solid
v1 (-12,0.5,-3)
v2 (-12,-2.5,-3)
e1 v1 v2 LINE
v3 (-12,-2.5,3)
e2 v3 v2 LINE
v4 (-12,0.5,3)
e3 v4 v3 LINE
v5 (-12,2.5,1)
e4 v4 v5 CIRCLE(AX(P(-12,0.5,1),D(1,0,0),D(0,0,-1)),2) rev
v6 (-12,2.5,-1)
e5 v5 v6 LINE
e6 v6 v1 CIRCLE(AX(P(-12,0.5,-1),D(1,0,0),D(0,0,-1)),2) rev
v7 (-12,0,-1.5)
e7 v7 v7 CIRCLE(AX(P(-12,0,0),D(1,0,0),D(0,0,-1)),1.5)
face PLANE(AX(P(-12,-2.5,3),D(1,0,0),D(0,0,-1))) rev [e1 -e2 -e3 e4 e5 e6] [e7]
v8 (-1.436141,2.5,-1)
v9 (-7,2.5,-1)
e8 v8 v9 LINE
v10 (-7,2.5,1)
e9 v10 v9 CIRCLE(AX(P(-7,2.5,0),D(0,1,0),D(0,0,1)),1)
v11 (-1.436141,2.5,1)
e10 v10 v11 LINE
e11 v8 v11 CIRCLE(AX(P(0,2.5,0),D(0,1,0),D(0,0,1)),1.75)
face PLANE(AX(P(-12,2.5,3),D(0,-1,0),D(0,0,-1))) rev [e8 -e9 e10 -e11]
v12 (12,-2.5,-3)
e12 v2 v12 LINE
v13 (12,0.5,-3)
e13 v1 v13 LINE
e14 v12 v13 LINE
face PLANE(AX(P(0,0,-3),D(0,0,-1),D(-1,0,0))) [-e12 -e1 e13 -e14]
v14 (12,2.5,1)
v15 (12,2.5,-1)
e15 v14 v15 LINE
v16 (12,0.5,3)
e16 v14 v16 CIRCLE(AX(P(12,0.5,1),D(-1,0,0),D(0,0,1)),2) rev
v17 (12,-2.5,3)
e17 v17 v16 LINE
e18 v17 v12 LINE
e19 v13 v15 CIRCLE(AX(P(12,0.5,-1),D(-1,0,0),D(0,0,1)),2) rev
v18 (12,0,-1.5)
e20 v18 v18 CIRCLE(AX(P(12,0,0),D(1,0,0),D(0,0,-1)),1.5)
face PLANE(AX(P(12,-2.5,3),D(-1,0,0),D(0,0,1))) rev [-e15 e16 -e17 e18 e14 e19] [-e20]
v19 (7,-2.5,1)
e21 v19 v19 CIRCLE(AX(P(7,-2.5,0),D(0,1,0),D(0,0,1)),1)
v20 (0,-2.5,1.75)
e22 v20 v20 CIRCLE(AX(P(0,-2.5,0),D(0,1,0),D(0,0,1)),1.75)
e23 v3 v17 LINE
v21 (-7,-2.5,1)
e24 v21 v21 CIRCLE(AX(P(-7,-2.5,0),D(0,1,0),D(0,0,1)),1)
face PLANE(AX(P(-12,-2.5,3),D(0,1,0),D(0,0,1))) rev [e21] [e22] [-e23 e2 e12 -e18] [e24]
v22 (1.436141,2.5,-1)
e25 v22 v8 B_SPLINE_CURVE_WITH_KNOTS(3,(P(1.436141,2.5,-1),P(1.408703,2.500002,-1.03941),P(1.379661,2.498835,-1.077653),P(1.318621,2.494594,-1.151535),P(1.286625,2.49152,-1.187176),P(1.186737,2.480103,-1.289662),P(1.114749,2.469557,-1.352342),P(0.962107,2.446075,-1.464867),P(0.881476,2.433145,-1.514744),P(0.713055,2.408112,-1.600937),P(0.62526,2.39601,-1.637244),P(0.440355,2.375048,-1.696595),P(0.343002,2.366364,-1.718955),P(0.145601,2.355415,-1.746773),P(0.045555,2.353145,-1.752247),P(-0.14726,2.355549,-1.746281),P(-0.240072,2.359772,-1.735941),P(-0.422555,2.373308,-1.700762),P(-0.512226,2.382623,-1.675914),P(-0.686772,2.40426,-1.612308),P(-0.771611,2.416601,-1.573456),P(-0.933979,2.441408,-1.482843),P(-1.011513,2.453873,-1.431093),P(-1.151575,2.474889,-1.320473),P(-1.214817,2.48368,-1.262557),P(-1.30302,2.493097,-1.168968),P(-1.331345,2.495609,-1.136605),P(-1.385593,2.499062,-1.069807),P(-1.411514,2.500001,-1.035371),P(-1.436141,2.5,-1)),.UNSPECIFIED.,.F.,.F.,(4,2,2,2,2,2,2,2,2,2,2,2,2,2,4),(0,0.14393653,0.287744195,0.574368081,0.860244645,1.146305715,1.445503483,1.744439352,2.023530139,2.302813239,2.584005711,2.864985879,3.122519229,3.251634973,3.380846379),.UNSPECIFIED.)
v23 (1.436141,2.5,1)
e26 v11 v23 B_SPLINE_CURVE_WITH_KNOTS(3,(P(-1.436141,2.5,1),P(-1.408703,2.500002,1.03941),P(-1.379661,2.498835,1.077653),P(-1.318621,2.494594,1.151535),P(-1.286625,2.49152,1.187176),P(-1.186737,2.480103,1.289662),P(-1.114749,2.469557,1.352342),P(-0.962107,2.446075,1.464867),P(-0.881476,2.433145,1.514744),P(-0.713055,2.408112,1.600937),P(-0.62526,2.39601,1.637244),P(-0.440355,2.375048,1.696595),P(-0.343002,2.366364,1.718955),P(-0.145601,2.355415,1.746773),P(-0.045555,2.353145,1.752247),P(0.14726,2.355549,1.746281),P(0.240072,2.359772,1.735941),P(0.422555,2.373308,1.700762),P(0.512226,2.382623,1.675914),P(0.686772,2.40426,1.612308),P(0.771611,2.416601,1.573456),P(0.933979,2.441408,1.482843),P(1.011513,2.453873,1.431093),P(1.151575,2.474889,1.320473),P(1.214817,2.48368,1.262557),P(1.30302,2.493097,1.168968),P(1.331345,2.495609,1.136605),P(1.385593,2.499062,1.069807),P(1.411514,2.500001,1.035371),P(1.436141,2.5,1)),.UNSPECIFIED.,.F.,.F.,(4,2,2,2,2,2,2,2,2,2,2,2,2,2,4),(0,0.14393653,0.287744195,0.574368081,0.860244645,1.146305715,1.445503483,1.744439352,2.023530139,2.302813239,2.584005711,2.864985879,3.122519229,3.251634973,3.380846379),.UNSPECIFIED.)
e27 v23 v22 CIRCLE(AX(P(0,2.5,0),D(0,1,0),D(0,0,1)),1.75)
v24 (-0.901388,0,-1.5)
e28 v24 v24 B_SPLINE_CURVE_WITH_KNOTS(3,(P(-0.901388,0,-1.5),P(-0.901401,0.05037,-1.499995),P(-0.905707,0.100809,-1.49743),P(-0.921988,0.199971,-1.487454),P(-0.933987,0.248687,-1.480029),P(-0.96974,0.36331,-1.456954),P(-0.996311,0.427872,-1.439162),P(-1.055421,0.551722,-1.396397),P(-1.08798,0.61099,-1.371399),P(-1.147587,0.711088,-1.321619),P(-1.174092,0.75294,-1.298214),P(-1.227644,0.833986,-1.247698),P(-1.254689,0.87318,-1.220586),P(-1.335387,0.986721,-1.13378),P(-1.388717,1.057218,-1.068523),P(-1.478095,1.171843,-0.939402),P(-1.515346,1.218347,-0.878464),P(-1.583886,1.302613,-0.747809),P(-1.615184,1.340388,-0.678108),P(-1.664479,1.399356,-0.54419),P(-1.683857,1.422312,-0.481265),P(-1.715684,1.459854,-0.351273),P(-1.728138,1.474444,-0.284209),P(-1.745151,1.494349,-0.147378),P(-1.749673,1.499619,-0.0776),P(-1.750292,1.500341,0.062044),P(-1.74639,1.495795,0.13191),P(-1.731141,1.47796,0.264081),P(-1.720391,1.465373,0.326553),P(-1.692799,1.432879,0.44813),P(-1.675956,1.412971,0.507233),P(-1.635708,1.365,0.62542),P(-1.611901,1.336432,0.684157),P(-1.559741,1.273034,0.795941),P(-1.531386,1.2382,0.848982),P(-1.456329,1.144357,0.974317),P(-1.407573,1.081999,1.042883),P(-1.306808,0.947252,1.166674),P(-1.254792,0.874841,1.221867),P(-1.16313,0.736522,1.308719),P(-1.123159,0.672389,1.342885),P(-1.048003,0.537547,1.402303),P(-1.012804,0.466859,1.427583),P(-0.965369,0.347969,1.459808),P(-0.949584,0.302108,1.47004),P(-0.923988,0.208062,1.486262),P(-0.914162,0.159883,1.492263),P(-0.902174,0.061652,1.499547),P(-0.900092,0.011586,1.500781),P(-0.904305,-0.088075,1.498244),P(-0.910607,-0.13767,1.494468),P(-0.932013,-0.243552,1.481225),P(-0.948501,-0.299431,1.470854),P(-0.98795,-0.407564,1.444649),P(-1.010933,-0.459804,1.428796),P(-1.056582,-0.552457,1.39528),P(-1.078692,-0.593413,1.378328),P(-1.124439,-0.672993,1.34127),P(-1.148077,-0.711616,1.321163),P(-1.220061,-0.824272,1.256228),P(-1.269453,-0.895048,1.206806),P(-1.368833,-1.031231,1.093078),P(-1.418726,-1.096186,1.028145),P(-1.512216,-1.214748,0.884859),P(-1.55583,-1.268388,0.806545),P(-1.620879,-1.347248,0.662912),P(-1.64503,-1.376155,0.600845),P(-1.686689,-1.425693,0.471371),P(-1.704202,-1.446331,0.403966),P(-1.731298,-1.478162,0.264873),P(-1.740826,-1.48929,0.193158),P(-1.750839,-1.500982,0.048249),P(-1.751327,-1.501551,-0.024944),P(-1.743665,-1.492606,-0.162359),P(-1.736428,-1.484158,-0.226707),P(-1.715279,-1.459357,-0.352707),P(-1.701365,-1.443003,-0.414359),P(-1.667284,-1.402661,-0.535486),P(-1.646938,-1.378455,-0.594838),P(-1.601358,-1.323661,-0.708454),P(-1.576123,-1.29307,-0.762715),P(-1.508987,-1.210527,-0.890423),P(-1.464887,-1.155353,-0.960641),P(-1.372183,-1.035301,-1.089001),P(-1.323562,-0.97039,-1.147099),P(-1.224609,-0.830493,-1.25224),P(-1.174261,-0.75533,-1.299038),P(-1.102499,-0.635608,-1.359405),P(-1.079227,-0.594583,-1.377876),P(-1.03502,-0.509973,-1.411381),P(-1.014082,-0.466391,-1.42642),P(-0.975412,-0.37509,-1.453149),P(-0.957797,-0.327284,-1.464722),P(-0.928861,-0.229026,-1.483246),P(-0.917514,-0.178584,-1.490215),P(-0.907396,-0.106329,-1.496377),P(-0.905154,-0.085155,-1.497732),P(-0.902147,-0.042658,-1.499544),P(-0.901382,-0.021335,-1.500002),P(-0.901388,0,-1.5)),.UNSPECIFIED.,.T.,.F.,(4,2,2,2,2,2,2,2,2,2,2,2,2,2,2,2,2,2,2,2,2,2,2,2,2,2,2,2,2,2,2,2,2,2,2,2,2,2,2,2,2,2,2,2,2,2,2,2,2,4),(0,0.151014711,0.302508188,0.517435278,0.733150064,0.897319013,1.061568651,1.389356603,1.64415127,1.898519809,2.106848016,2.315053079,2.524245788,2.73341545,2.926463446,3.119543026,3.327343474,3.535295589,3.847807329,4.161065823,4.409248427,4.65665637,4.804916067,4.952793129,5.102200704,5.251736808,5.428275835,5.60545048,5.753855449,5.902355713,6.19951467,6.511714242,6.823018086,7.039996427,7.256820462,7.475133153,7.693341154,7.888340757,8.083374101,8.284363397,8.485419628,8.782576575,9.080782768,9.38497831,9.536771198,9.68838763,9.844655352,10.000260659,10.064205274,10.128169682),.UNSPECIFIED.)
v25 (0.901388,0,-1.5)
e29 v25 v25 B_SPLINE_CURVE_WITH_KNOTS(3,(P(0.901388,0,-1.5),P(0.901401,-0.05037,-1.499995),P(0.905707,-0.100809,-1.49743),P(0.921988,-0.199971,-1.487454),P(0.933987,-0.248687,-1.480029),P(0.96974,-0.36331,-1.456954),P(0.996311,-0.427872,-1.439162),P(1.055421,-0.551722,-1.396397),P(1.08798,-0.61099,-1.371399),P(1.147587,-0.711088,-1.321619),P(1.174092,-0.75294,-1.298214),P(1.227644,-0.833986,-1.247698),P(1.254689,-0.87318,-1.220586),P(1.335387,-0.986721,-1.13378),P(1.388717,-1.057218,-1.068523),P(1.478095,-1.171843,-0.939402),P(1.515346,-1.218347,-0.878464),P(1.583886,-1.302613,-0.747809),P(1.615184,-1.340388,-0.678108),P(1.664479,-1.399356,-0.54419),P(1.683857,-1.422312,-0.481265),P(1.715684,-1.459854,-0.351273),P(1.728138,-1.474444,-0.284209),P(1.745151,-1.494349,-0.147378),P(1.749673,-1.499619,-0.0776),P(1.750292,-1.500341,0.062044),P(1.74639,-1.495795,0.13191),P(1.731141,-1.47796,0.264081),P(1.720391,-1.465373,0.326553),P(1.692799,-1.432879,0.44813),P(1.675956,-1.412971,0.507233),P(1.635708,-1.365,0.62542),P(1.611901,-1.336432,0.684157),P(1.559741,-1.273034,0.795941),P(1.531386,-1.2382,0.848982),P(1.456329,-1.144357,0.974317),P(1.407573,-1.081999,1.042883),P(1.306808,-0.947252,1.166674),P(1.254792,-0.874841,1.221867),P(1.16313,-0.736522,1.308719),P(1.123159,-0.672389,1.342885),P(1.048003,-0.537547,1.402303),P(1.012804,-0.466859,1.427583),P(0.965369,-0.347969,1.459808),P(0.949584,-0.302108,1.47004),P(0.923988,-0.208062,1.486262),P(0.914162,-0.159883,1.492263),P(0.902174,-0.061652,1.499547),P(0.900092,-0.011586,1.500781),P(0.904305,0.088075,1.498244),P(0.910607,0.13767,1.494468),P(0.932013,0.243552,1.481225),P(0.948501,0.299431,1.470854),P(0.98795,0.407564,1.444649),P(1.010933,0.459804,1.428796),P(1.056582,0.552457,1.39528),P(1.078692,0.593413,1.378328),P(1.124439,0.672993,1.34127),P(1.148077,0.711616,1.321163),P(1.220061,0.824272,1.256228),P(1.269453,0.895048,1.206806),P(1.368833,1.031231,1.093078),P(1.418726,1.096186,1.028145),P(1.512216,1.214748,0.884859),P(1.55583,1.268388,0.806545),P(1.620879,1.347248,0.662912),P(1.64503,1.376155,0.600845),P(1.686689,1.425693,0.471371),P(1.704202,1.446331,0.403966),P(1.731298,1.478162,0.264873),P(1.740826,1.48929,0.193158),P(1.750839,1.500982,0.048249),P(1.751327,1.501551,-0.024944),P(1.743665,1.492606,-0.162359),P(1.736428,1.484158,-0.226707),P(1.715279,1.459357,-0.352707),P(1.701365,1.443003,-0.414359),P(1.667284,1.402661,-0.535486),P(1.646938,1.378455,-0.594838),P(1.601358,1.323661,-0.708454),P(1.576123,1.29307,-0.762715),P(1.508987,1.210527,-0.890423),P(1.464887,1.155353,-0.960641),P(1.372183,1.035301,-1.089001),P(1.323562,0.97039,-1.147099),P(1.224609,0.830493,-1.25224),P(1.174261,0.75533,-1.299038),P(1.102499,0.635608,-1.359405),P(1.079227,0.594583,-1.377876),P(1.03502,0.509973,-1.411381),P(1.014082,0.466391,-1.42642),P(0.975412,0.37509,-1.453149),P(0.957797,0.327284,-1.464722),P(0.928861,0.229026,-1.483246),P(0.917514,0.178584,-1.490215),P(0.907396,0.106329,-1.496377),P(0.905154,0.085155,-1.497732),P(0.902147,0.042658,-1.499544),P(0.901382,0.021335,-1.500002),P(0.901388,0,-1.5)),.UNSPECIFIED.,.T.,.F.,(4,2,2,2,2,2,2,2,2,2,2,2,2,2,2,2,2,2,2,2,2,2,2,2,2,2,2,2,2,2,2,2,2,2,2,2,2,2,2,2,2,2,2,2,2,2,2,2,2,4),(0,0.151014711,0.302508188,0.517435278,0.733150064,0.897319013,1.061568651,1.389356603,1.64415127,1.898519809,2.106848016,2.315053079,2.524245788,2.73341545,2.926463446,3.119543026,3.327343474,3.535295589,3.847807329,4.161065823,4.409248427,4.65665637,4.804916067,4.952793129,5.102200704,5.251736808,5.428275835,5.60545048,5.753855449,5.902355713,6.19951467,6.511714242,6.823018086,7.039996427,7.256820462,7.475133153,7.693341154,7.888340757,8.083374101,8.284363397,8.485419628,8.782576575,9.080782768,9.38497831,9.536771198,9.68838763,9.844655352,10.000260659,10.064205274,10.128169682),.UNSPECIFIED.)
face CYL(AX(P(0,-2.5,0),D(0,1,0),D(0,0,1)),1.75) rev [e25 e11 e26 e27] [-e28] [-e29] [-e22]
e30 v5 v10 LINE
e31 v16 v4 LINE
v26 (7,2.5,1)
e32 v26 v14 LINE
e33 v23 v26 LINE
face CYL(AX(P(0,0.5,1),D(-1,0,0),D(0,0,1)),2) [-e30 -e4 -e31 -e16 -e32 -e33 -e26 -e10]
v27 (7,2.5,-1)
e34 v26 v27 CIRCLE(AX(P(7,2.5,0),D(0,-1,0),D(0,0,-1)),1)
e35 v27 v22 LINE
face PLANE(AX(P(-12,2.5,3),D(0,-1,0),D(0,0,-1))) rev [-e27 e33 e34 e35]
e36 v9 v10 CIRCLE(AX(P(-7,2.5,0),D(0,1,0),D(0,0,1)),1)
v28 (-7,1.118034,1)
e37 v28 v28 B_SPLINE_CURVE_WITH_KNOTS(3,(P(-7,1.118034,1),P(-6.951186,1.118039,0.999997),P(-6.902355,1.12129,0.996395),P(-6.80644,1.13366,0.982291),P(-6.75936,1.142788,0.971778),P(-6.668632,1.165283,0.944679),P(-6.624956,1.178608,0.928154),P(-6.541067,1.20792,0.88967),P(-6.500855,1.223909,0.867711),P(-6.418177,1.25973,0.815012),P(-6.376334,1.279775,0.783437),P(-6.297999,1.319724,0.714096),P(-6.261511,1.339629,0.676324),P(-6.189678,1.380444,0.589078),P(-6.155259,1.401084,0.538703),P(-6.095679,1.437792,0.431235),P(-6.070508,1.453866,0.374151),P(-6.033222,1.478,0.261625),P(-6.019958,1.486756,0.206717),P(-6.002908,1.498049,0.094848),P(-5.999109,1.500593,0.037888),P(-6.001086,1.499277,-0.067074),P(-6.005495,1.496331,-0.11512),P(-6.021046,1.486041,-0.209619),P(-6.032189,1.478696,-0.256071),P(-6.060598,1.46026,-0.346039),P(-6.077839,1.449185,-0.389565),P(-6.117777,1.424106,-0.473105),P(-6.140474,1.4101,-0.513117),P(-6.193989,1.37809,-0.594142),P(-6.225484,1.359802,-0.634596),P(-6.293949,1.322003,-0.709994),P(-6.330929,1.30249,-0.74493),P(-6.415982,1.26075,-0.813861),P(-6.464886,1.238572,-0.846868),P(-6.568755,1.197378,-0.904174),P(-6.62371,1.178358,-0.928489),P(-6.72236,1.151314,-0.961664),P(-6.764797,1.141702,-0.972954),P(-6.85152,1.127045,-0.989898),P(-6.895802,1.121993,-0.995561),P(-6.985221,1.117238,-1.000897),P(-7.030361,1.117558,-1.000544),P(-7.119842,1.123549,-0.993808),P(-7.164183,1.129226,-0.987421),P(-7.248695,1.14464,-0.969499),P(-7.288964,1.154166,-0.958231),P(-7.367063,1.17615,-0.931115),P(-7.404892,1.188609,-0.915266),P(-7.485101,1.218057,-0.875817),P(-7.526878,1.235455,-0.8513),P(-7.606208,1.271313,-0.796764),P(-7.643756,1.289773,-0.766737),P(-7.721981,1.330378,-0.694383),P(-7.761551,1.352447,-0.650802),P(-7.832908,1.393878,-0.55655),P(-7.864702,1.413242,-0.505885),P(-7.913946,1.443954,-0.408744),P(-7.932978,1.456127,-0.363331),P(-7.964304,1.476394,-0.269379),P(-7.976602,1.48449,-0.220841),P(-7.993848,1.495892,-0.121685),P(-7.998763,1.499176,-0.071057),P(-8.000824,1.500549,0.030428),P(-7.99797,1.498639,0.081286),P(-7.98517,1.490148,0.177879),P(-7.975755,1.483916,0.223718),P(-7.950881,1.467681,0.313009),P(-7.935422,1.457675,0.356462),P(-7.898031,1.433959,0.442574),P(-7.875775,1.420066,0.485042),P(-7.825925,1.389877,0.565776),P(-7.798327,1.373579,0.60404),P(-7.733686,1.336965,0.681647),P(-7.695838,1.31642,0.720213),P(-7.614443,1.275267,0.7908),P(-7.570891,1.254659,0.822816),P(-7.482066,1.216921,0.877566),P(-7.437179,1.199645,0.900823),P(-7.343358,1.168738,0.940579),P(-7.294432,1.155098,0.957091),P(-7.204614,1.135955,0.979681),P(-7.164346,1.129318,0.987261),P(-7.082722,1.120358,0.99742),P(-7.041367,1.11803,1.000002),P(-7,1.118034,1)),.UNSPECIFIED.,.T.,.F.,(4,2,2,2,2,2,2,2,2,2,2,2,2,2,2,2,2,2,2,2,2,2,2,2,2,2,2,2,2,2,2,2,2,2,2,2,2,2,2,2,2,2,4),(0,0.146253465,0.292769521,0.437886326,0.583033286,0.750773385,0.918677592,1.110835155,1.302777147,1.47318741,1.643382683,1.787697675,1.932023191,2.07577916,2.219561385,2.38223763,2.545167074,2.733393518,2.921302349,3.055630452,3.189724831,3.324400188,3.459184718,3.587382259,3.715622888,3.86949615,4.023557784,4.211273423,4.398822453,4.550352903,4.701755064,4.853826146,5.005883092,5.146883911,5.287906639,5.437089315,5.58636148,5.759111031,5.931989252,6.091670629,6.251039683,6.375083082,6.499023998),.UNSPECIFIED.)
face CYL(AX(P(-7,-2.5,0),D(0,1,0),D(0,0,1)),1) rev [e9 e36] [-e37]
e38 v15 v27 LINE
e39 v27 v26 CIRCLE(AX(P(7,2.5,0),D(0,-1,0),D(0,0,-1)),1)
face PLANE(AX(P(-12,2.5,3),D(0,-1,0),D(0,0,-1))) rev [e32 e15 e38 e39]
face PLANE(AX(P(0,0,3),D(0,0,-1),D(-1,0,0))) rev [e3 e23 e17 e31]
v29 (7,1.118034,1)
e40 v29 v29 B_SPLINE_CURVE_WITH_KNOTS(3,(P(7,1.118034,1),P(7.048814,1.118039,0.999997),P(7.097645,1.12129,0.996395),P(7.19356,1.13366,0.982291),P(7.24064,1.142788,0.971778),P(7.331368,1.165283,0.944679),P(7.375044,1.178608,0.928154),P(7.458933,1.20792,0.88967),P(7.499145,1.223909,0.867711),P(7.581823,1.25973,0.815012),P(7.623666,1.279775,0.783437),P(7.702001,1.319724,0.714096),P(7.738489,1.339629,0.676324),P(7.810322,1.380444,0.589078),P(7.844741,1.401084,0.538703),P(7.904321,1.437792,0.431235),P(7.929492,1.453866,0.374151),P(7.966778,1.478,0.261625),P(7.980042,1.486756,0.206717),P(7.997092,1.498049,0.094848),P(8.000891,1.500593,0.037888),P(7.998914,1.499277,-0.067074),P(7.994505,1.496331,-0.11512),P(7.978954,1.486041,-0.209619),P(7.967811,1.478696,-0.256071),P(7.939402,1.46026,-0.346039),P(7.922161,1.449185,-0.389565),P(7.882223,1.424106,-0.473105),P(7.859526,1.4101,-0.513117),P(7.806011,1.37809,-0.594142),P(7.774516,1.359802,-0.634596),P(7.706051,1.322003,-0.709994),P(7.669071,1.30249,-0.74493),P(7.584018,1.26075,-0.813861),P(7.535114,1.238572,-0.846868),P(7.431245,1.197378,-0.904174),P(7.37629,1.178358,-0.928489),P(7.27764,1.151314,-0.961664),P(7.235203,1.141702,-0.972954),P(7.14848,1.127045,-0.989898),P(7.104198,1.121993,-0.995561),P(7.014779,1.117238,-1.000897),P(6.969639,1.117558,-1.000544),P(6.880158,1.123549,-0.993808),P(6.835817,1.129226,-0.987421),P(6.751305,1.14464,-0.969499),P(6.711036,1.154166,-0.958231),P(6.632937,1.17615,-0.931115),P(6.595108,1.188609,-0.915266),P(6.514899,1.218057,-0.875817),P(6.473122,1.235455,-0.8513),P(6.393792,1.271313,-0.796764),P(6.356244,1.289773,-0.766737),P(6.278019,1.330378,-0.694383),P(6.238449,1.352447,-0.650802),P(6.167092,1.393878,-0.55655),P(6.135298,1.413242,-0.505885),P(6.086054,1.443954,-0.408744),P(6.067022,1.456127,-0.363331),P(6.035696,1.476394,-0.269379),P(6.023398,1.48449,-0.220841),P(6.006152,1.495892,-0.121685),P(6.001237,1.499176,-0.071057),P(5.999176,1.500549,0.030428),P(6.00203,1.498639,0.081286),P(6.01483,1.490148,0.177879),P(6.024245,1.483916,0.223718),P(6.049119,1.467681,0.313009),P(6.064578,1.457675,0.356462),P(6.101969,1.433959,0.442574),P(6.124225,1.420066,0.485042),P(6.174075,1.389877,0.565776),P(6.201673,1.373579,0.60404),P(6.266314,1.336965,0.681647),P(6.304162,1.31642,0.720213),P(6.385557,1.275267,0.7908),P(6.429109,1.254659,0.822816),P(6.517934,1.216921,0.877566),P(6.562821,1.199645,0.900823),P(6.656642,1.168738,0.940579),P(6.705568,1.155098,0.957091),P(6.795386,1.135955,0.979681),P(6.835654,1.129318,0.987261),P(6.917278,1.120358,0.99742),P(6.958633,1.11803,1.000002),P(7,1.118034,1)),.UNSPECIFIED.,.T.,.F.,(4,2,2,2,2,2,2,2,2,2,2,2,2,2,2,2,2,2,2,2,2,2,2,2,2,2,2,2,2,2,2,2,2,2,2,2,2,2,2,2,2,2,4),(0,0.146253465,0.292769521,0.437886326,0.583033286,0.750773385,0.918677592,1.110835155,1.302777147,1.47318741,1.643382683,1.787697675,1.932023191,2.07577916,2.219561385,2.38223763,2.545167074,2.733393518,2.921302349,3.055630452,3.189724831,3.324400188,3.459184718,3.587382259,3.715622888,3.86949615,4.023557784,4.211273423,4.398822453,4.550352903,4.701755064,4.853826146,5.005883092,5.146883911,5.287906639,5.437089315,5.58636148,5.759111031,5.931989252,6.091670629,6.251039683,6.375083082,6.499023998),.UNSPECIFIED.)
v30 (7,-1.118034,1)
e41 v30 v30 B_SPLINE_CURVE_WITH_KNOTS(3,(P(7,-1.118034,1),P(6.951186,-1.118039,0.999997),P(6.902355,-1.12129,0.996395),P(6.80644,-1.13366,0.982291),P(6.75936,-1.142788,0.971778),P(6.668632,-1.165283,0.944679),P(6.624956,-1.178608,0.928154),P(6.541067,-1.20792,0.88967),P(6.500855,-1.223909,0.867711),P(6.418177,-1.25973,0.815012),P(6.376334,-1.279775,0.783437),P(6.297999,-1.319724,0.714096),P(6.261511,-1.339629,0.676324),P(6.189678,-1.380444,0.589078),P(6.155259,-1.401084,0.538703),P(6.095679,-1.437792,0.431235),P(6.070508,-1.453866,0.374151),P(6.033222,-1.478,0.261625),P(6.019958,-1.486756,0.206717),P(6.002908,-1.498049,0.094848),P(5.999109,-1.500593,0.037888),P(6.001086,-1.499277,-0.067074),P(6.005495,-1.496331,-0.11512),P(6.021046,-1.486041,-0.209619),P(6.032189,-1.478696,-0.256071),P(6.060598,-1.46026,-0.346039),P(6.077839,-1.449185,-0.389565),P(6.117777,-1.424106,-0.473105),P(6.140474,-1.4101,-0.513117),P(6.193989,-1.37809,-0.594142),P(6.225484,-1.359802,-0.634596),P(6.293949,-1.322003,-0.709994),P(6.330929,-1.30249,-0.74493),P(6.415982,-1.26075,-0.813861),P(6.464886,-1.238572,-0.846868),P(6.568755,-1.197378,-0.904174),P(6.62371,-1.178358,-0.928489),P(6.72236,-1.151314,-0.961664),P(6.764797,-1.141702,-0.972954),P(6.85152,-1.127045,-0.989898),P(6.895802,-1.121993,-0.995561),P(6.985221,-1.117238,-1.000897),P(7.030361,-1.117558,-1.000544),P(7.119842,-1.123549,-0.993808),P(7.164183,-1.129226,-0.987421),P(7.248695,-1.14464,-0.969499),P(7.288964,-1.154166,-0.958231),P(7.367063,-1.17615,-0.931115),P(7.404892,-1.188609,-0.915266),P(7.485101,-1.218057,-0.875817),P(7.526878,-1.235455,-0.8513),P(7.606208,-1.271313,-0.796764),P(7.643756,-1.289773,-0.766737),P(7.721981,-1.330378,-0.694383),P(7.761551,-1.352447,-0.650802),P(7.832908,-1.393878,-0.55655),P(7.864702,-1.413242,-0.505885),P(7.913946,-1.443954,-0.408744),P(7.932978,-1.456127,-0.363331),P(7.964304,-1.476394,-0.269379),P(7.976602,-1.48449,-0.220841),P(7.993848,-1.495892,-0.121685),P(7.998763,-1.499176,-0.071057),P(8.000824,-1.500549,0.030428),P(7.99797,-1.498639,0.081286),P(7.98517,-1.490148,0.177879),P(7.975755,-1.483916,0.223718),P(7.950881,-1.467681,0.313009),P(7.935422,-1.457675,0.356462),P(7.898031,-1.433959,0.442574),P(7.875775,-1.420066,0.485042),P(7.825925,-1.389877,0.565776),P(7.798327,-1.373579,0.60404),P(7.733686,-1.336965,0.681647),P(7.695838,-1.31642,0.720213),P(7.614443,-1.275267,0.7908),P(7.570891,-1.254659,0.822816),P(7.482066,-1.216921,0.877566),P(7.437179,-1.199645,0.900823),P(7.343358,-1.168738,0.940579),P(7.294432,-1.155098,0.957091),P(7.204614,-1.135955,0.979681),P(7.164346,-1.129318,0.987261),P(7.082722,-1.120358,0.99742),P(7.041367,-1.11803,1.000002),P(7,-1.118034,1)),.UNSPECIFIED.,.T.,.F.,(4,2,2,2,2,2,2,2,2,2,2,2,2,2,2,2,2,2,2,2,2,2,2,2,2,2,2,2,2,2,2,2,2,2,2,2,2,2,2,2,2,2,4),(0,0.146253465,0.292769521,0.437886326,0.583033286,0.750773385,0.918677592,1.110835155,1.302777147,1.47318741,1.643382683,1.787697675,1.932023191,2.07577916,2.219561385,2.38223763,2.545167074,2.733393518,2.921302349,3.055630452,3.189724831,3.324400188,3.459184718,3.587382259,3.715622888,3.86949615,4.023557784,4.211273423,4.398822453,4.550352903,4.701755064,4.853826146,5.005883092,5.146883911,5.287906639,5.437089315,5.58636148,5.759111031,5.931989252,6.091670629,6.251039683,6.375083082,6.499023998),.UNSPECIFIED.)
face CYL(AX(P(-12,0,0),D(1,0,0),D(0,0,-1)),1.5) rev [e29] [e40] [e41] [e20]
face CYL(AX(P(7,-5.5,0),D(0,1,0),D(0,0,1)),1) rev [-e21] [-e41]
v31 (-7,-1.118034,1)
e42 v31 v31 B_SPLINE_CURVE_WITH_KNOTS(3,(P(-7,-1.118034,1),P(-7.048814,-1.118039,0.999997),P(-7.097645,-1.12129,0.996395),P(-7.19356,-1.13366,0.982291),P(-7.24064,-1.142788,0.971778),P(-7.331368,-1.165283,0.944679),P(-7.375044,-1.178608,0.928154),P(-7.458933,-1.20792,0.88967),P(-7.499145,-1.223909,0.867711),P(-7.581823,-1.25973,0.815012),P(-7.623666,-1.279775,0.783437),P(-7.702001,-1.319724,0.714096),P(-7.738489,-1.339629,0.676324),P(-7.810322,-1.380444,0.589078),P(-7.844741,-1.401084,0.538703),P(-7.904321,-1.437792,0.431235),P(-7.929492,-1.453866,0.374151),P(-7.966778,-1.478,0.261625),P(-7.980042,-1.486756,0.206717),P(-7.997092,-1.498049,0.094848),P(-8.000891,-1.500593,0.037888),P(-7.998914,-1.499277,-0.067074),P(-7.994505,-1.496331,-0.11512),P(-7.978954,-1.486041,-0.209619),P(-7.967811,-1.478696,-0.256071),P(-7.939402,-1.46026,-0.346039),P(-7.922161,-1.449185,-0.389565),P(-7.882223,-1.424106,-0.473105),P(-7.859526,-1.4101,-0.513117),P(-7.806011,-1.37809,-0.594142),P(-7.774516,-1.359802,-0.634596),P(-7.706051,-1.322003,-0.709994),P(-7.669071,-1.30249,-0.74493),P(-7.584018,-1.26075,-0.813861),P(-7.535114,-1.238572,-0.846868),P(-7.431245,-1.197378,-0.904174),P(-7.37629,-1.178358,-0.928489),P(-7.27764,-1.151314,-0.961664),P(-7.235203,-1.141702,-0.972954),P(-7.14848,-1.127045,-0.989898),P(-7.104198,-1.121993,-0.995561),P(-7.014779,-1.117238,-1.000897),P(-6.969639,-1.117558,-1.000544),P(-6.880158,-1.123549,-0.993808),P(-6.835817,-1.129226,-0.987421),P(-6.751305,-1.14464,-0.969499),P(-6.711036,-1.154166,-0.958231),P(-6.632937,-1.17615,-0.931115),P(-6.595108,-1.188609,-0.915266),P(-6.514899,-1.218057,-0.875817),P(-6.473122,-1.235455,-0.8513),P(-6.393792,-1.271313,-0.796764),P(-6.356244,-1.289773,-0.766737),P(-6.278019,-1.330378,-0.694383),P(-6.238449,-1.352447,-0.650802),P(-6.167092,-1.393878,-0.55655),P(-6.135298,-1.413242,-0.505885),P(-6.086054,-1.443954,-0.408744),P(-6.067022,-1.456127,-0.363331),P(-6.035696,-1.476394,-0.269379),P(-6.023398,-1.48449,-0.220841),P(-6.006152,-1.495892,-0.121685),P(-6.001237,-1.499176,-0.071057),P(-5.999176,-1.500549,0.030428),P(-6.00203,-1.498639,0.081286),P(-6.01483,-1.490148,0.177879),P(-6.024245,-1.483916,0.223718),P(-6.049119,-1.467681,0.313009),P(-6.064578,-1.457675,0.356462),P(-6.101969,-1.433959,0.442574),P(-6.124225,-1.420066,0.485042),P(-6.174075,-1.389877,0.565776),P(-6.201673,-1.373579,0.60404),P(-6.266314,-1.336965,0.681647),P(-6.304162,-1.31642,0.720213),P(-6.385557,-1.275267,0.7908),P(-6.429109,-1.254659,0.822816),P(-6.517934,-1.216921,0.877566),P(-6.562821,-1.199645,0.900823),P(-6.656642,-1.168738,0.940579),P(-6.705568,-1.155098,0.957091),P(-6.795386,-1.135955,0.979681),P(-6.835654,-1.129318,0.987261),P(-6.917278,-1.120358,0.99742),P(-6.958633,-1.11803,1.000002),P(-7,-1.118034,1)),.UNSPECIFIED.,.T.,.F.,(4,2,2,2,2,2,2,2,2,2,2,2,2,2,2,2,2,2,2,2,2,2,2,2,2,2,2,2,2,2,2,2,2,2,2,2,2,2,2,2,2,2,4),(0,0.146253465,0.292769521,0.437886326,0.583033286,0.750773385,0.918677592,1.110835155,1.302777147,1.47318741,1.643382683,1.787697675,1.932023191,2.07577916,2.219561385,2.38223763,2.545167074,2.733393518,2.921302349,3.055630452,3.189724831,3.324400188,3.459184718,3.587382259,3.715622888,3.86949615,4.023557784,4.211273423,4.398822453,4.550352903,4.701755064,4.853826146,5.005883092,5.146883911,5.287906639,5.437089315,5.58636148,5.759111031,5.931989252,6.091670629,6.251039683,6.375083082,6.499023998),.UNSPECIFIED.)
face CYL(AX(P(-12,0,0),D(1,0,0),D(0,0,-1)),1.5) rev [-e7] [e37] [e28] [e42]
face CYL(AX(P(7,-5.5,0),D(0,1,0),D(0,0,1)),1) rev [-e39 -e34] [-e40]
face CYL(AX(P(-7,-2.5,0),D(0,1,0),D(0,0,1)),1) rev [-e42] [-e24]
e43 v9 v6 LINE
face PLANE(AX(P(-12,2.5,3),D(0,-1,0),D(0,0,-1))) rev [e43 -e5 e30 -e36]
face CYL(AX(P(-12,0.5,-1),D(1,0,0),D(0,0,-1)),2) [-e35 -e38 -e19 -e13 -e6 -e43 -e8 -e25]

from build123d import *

# Parameters (mm, degrees)
SKETCH_1_W          = 24
SKETCH_1_H          = 5
EXTRUDE_1_DEPTH     = 3
SKETCH_2_R          = 1.5
CUT_EXTRUDE_1_DEPTH = 25.315632832
SKETCH_3_R          = 1.75
CUT_EXTRUDE_2_DEPTH = 14.341664064
SKETCH_4_R          = 1
CUT_EXTRUDE_3_DEPTH = 14.341664192
SKETCH_5_R          = 1
EXTRUDE_3_DEPTH     = 2
SKETCH_6_W          = 2
SKETCH_6_H          = 0.5
CUT_EXTRUDE_7_DEPTH = 3
CUT_EXTRUDE_START   = -10
SKETCH_8_R          = 1
CUT_EXTRUDE_9_DEPTH = 10
FILLET_2_R          = 2


with BuildPart() as part:
    # 草图1 → 凸台-拉伸1 (new, symmetric)
    with BuildSketch(Plane.XY):
        Rectangle(SKETCH_1_W, SKETCH_1_H)
    extrude(amount=EXTRUDE_1_DEPTH, both=True)

    # 草图2 → 切除-拉伸1 (cut, through all)
    with BuildSketch(Plane(origin=(12, 0, 0), x_dir=(0, 0, -1), z_dir=(1, 0, 0))):
        Circle(SKETCH_2_R)
    extrude(amount=-CUT_EXTRUDE_1_DEPTH, mode=Mode.SUBTRACT)

    # 草图3 → 切除-拉伸2 (cut, through all)
    with BuildSketch(Plane(origin=(0, 2.5, 0), x_dir=(1, 0, 0), z_dir=(0, 1, 0))):
        with Locations(Location((0, 0, 0), (0, 0, 270))):
            Circle(SKETCH_3_R)
    extrude(amount=-CUT_EXTRUDE_2_DEPTH, mode=Mode.SUBTRACT)

    # 草图4 → 切除-拉伸3 (cut, through all)
    with BuildSketch(Plane(origin=(0, 2.5, 0), x_dir=(1, 0, 0), z_dir=(0, 1, 0))):
        with Locations(Location((-7, 0, 0), (0, 0, 270))):
            Circle(SKETCH_4_R)
    extrude(amount=-CUT_EXTRUDE_3_DEPTH, mode=Mode.SUBTRACT)

    # 草图5 → 凸台-拉伸3 (add)
    with BuildSketch(Plane(origin=(0, 2.5, 0), x_dir=(1, 0, 0), z_dir=(0, 1, 0))):
        with Locations(Location((7, 0, 0), (0, 0, 270))):
            Circle(SKETCH_5_R)
    extrude(amount=EXTRUDE_3_DEPTH)

    # 草图6 → 切除-拉伸7 (cut)
    with BuildSketch(Plane(origin=(0, 0, -3), x_dir=(-1, 0, 0), z_dir=(0, 0, -1))):
        with Locations((-7, 3.25)):
            Rectangle(SKETCH_6_W, SKETCH_6_H)
    extrude(amount=-CUT_EXTRUDE_7_DEPTH, mode=Mode.SUBTRACT)

    # 草图8 → 切除-拉伸9 (cut)
    with BuildSketch(Plane(origin=(0, 4.5, 0), x_dir=(1, 0, 0), z_dir=(0, 1, 0)).offset(CUT_EXTRUDE_START)):
        with Locations(Location((7, 0, 0), (0, 0, 270))):
            Circle(SKETCH_8_R)
    extrude(amount=CUT_EXTRUDE_9_DEPTH, mode=Mode.SUBTRACT)

    # 圆角2
    # the kernel refuses this fillet: 2 mm, written as the material it takes off along each edge
    with BuildSketch(Plane(origin=(17, 2.5, -3), x_dir=(0, -1, 0), z_dir=(-1, 0, 0))) as fillet_2_piece_1:
        with BuildLine():
            CenterArc((FILLET_2_R, FILLET_2_R), FILLET_2_R, 180, 90)
            Line((0, FILLET_2_R), (0, 0))
            Line((0, 0), (FILLET_2_R, 0))
        make_face()
    extrude(amount=34, mode=Mode.SUBTRACT)
    with BuildSketch(Plane(origin=(17, 2.5, 3), x_dir=(0, -1, 0), z_dir=(-1, 0, 0))) as fillet_2_piece_2:
        with BuildLine():
            CenterArc((FILLET_2_R, -FILLET_2_R), FILLET_2_R, 90, 90)
            Line((0, -FILLET_2_R), (0, 0))
            Line((0, 0), (FILLET_2_R, 0))
        make_face()
    extrude(amount=34, mode=Mode.SUBTRACT)


solid = part.part
